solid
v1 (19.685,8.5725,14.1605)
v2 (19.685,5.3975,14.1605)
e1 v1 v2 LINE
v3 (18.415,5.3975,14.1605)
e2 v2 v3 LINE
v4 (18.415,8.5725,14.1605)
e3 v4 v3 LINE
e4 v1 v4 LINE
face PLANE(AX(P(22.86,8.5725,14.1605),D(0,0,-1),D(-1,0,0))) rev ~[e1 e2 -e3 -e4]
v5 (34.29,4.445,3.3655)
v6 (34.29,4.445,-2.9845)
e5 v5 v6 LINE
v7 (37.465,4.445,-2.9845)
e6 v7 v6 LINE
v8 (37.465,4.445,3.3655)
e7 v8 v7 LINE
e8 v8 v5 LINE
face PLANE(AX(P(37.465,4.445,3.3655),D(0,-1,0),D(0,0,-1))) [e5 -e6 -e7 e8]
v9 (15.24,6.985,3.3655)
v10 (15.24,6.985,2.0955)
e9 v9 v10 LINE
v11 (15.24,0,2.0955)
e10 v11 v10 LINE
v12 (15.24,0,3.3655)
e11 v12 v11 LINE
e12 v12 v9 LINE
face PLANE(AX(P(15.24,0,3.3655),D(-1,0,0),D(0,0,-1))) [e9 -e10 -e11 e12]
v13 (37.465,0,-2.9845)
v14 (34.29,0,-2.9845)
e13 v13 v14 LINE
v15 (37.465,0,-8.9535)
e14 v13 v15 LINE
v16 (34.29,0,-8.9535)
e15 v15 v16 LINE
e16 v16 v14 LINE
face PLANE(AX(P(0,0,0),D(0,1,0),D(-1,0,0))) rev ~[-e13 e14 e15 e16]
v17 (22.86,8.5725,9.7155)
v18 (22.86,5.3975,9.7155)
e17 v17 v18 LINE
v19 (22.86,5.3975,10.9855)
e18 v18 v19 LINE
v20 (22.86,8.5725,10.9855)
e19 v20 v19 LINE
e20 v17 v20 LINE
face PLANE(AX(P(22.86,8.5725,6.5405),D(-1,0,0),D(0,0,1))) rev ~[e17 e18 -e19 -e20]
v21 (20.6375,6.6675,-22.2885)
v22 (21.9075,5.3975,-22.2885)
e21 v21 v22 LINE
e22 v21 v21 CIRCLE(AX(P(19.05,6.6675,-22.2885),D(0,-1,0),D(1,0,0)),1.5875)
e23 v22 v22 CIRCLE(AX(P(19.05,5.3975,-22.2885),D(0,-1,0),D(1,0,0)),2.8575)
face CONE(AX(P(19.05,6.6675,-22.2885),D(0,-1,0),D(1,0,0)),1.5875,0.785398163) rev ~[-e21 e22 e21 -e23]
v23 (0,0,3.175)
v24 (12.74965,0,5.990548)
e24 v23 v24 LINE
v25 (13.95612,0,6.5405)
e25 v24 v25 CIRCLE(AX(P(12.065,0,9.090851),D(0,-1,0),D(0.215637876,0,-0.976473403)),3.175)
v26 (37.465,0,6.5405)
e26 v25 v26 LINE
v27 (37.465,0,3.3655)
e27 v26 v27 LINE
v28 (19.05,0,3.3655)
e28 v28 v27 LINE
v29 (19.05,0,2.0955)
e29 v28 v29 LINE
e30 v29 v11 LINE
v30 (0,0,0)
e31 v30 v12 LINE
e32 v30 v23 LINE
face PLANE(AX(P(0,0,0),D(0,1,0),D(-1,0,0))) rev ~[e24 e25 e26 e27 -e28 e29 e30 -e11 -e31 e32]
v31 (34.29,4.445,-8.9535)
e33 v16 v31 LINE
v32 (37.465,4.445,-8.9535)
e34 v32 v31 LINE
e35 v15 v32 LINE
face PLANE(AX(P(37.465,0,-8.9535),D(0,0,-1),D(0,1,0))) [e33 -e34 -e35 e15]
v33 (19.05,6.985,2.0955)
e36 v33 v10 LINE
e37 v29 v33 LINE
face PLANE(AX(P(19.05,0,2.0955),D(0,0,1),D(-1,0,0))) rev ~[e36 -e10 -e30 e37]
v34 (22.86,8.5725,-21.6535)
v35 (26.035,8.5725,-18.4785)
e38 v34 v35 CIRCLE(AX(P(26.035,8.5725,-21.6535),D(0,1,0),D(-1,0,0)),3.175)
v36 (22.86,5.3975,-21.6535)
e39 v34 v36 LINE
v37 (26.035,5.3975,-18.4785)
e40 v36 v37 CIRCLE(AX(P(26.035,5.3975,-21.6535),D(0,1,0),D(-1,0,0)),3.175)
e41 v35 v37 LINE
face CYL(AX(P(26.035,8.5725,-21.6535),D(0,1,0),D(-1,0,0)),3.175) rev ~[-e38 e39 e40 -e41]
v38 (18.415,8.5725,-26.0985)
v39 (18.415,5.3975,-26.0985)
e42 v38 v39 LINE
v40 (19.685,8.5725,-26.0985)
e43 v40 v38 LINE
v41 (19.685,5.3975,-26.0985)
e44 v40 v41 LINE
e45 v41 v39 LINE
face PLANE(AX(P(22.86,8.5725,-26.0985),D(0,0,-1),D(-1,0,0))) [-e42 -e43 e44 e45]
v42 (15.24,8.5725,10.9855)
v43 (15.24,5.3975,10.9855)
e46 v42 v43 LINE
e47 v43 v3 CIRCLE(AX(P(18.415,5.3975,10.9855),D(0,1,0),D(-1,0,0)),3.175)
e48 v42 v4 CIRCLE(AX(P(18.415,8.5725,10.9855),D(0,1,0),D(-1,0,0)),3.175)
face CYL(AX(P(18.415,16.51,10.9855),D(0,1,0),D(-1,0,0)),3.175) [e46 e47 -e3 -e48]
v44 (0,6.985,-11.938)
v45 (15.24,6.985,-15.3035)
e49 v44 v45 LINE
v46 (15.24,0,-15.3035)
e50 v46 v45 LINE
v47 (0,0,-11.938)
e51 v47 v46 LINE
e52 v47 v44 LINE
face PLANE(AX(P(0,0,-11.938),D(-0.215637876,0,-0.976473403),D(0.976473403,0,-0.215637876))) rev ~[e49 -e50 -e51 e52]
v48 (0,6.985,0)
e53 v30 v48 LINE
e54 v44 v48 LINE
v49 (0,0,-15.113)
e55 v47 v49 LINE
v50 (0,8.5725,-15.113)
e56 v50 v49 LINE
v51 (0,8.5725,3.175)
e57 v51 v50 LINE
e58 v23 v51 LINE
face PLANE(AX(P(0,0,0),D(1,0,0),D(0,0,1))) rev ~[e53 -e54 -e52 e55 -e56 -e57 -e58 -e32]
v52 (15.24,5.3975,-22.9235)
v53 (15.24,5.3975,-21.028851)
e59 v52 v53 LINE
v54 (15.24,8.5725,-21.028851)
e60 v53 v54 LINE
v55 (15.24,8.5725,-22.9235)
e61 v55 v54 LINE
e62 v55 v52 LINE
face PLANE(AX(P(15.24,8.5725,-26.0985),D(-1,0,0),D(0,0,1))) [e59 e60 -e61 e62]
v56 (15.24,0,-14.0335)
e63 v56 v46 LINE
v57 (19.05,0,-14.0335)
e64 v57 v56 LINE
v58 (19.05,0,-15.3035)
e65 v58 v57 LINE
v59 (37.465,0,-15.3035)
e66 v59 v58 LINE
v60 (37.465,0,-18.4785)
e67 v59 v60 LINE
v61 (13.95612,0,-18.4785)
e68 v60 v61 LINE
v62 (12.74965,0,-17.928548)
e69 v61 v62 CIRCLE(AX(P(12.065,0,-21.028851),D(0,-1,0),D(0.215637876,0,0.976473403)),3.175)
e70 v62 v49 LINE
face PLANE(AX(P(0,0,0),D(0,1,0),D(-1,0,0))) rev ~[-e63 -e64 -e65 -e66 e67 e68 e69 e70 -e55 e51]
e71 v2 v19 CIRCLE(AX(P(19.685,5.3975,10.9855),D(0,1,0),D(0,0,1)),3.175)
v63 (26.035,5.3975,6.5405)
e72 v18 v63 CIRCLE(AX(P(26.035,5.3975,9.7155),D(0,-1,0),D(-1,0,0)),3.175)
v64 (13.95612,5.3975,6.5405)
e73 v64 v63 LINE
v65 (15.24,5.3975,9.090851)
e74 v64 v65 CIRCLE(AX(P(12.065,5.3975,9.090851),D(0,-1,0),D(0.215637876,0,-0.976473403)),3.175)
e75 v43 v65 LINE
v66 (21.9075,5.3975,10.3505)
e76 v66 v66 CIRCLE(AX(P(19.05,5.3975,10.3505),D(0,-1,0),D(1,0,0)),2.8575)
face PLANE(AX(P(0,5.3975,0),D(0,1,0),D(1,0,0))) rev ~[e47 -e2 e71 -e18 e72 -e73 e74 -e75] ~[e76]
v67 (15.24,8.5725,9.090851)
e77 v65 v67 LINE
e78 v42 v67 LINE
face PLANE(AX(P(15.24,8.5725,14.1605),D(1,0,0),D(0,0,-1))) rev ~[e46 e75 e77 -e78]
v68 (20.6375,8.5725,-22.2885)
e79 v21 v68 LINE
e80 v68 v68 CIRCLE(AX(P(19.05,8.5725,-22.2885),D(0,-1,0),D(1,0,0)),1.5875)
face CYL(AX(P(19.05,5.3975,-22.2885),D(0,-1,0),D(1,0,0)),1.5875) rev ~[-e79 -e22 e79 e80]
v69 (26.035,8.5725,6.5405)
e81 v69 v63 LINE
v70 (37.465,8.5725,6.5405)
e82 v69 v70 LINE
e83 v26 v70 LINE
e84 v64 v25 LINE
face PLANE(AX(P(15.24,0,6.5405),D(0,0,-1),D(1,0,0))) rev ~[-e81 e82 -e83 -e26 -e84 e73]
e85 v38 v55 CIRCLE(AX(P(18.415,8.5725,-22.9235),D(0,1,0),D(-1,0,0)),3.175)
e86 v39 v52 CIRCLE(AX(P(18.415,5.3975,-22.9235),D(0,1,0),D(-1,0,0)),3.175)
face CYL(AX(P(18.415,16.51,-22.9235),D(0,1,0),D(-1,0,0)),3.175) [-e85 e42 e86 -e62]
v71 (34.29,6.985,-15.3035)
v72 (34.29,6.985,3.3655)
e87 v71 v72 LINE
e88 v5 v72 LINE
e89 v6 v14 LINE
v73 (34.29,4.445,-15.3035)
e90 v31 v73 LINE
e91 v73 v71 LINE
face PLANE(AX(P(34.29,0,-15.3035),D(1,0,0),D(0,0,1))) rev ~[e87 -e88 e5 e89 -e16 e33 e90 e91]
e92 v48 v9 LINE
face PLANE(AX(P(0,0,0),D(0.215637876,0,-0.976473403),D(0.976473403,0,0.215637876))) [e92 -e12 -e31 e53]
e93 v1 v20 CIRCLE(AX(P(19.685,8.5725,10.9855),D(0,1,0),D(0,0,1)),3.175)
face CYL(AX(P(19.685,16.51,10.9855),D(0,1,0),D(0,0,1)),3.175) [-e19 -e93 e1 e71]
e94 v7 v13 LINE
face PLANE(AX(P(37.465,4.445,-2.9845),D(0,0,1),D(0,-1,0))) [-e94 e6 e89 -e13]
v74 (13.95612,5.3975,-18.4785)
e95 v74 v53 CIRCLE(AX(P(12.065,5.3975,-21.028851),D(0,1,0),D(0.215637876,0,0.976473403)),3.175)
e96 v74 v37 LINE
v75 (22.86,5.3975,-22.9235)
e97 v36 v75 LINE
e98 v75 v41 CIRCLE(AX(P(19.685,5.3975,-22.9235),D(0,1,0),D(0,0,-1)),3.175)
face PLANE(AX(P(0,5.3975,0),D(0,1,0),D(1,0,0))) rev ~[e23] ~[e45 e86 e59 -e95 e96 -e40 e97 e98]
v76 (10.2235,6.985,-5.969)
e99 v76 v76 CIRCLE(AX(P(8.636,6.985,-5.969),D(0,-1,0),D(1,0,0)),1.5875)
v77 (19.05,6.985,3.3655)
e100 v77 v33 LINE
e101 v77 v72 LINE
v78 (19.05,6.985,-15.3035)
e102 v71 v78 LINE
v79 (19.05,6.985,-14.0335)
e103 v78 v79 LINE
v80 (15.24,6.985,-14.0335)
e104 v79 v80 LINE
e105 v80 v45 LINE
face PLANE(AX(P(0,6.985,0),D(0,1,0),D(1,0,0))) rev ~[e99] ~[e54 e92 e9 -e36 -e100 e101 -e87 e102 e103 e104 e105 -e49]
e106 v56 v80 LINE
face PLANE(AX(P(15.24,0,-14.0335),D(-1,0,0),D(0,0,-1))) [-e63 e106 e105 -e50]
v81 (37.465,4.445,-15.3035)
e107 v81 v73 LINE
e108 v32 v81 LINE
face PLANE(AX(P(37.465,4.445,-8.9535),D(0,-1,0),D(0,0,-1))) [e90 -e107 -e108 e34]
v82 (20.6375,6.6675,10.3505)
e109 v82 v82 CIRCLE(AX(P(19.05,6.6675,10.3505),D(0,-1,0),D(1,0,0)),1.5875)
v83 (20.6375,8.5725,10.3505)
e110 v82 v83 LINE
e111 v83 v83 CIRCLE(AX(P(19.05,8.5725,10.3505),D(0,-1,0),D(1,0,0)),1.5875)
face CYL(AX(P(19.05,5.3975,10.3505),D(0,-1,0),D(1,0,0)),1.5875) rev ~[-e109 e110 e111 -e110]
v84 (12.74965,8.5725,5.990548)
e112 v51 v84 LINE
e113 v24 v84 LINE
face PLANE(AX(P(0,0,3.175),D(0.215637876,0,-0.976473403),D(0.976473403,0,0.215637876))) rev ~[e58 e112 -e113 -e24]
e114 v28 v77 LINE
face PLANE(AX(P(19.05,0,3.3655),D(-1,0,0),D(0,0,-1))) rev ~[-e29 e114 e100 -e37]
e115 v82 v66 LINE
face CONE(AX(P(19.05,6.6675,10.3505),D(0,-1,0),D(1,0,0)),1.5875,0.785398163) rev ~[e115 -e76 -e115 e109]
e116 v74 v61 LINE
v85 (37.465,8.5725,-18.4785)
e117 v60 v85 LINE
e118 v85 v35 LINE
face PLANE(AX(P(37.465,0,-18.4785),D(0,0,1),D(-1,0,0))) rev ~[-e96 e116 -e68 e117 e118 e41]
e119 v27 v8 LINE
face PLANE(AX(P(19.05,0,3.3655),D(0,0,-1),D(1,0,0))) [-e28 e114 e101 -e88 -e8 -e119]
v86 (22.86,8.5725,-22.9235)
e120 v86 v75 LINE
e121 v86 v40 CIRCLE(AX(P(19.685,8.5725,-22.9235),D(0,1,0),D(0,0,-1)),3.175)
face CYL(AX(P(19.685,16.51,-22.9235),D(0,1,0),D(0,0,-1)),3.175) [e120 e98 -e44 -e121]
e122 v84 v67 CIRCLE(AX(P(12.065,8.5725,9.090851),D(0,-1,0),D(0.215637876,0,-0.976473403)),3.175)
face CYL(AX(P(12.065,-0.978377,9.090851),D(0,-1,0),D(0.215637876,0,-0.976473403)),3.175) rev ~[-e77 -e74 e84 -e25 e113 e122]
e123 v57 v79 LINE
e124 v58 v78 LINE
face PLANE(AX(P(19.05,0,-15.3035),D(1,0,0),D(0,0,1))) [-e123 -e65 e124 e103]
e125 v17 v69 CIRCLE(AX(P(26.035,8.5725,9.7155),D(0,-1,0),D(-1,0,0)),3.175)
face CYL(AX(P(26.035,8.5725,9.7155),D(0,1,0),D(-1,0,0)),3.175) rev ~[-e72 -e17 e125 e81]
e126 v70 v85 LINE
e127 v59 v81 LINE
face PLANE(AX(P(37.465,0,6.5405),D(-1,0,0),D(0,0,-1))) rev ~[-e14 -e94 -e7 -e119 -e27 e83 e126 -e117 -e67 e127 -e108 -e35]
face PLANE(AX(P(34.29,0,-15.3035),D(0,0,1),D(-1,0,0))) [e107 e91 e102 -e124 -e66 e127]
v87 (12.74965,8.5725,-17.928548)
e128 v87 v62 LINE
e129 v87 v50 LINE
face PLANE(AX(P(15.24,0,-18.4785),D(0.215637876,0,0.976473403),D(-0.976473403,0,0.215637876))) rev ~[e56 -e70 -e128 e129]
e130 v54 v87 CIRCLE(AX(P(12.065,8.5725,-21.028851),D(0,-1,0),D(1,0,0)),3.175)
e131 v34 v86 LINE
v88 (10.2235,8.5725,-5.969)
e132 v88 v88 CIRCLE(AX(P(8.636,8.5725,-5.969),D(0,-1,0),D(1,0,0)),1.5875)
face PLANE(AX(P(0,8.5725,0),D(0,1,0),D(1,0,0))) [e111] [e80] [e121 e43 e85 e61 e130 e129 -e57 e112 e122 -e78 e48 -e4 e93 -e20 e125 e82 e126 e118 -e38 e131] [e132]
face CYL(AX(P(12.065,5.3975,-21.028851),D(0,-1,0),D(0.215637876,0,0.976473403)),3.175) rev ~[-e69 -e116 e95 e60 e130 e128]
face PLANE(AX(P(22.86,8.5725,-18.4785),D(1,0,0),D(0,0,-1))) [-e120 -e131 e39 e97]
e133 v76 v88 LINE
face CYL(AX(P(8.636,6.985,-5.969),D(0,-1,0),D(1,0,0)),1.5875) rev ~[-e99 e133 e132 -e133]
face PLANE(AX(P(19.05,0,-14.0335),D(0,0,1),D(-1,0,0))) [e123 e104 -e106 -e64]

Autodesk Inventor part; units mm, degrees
ref_plane "YZ Plane" through (0, 0, 0) normal (1, 0, 0) x (0, 1, 0)
ref_plane "XZ Plane" through (0, 0, 0) normal (0, 1, 0) x (-1, 0, 0)
ref_plane "XY Plane" through (0, 0, 0) normal (0, 0, 1) x (1, 0, 0)
sketch "Sketch1" plane through (0, 0, 0) normal (0, 1, 0) x (-1, 0, 0)
  line L0 (0, 0) -> (0, -11.938)
  line L1 (-15.24, 3.3655) -> (-15.24, -15.3035)
  line L2 (0, 0) -> (-15.24, 3.3655)
  line L3 (0, -11.938) -> (-15.24, -15.3035)
  line L4 (-15.24, 3.3655) -> (-19.05, 3.3655)
  line L5 (-19.05, 3.3655) -> (-19.05, 2.0955)
  line L6 (-19.05, 2.0955) -> (-15.24, 2.0955)
  line L7 (-15.24, 2.0955) -> (-15.24, 3.3655)
  line L8 (-15.24, -15.3035) -> (-19.05, -15.3035)
  line L9 (-19.05, -15.3035) -> (-19.05, -14.0335)
  line L10 (-19.05, -14.0335) -> (-15.24, -14.0335)
  line L11 (-15.24, -14.0335) -> (-15.24, -15.3035)
  line L12 (0, 0) -> (0, 3.175)
  line L13 (-15.24, 3.3655) -> (-15.24, 6.5405)
  line L14 (0, -11.938) -> (0, -15.113)
  line L15 (-15.24, -15.3035) -> (-15.24, -18.4785)
  line L16 (-15.24, -18.4785) -> (0, -15.113)
  line L17 (0, 3.175) -> (-15.24, 6.5405)
  line L18 (-15.24, 6.5405) -> (-34.29, 6.5405)
  line L19 (-19.05, 3.3655) -> (-34.29, 3.3655)
  line L20 (-34.29, 3.3655) -> (-34.29, 6.5405)
  line L21 (-15.24, -18.4785) -> (-34.29, -18.4785)
  line L22 (-34.29, -18.4785) -> (-34.29, -15.3035)
  line L23 (-34.29, -15.3035) -> (-19.05, -15.3035)
  line L24 (-34.29, 6.5405) -> (-37.465, 6.5405)
  line L25 (-37.465, 6.5405) -> (-37.465, -18.4785)
  line L26 (-37.465, -18.4785) -> (-34.29, -18.4785)
  line L27 (-34.29, -18.4785) -> (-34.29, 6.5405)
  dimension "d0" = 11.938
  dimension "d1" = 15.24
  dimension "d2" = 18.669
  dimension "d3" = 3.3655
  dimension "d4" = 3.81
  dimension "d5" = 1.27
  dimension "d6" = 3.81
  dimension "d7" = 1.27
  dimension "d8" = 3.175
  dimension "d9" = 3.175
  dimension "d10" = 3.175
  dimension "d11" = 3.175
  dimension "d12" = 19.05
  dimension "d13" = 3.175
extrude "Extrusion1" add sketch "Sketch1" along normal blind 6.985 contours L2 L13 L17 L12 | L14 L16 L15 L3 | L1 L6 L5 L4 | L4 L19 L20 L18 L13 | L8 L9 L10 L1 | L15 L21 L22 L23 L8 | L27 L22 L26 L25 L24 L20
sketch "Sketch2" plane through (0, 6.985, 0) normal (0, 1, 0) x (1, 0, 0)
  line L0 (0, 11.938) -> (15.24, 15.3035) projected
  line L1 (15.24, 15.3035) -> (15.24, 14.0335) projected
  line L2 (15.24, 14.0335) -> (19.05, 14.0335) projected
  line L3 (19.05, 14.0335) -> (19.05, 15.3035) projected
  line L4 (19.05, 15.3035) -> (34.29, 15.3035) projected
  line L5 (34.29, 15.3035) -> (34.29, -3.3655) projected
  line L6 (34.29, -3.3655) -> (19.05, -3.3655) projected
  line L7 (19.05, -3.3655) -> (19.05, -2.0955) projected
  line L8 (19.05, -2.0955) -> (15.24, -2.0955) projected
  line L9 (15.24, -2.0955) -> (15.24, -3.3655) projected
  line L10 (15.24, -3.3655) -> (0, 0) projected
  line L11 (0, 0) -> (0, -3.175) projected
  line L12 (0, -3.175) -> (15.24, -6.5405) projected
  line L13 (15.24, -6.5405) -> (37.465, -6.5405) projected
  line L14 (37.465, -6.5405) -> (37.465, 18.4785) projected
  line L15 (37.465, 18.4785) -> (15.24, 18.4785) projected
  line L16 (15.24, 18.4785) -> (0, 15.113) projected
  line L17 (0, 15.113) -> (0, 11.938) projected
  line L18 (0, 0) -> (0, -3.175) projected
  line L19 (15.24, 18.4785) -> (0, 15.113) projected
  line L20 (0, -3.175) -> (0, 15.113)
extrude "Extrusion2" add sketch "Sketch2" along normal blind 1.5875
sketch "Sketch3" plane through (37.465, 0, 6.5405) normal (1, 0, 0) x (0, 0, -1)
  line L0 (21.844, 0) -> (21.844, 6.985) projected
  line L1 (21.844, 0) -> (3.175, 0) projected
  line L2 (3.175, 0) -> (3.175, 6.985) projected
  line L3 (21.844, 6.985) -> (3.175, 6.985) projected
  line L4 (3.175, 0) -> (3.175, 6.985) projected
  line L5 (3.175, 4.445) -> (9.525, 4.445)
  line L6 (9.525, 4.445) -> (9.525, 0)
  line L7 (9.525, 0) -> (3.175, 0)
  line L8 (3.175, 0) -> (3.175, 4.445)
  line L9 (21.844, 0) -> (21.844, 6.985) projected
  line L10 (21.844, 0) -> (15.494, 0)
  line L11 (15.494, 0) -> (15.494, 4.445)
  line L12 (15.494, 4.445) -> (21.844, 4.445)
  line L13 (21.844, 4.445) -> (21.844, 0)
  line L14 (0, 0) -> (25.019, 0) projected
  point P0 (6.5405, 0)
  dimension "d18" = 6.35
  dimension "d19" = 6.35
  dimension "d20" = 4.445
  dimension "d21" = 4.445
extrude "Extrusion3" cut sketch "Sketch3" against normal blind 3.175 contours L1 L11 L12 L0 | L1 L2 L5 L6
sketch "Sketch5" plane through (0, 6.985, 0) normal (0, -1, 0) x (1, 0, 0)
  circle A0 centre (8.636, -5.969) radius 1.5875
  line L0 (0, 0) -> (0, 3.175) projected
  line L1 (0, -11.938) -> (0, 0) projected
  dimension "d24" = 3.175
  dimension "d25" = 8.636
extrude "Extrusion4" cut sketch "Sketch5" against normal blind 25.4
sketch "Sketch6" plane through (0, 8.5725, 0) normal (0, 1, 0) x (1, 0, 0)
  line L0 (37.465, 18.4785) -> (15.24, 18.4785) projected
  line L1 (15.24, -6.5405) -> (37.465, -6.5405) projected
  line L2 (15.24, 18.4785) -> (0, 15.113) projected
  line L3 (15.24, 18.4785) -> (22.86, 18.4785)
  line L4 (22.86, 18.4785) -> (22.86, 26.0985)
  line L5 (22.86, 26.0985) -> (15.24, 26.0985)
  line L6 (15.24, 26.0985) -> (15.24, 18.4785)
  line L7 (15.24, -6.5405) -> (22.86, -6.5405)
  line L8 (22.86, -6.5405) -> (22.86, -14.1605)
  line L9 (22.86, -14.1605) -> (15.24, -14.1605)
  line L10 (15.24, -14.1605) -> (15.24, -6.5405)
  point P0 (0, 0)
  dimension "d28" = 7.62
  dimension "d29" = 7.62
  dimension "d30" = 7.62
  dimension "d31" = 7.62
extrude "Extrusion5" add sketch "Sketch6" against normal blind 3.175
sketch "Sketch7" plane through (0, 5.3975, 0) normal (0, -1, 0) x (1, 0, 0)
  line L0 (22.86, 6.5405) -> (15.24, 6.5405) projected
  line L1 (22.86, 6.5405) -> (22.86, 14.1605) projected
  line L2 (22.86, 14.1605) -> (15.24, 14.1605) projected
  line L3 (15.24, 14.1605) -> (15.24, 6.5405) projected
  line L4 (15.24, -18.4785) -> (22.86, -18.4785) projected
  line L5 (15.24, -18.4785) -> (15.24, -26.0985) projected
  line L6 (15.24, -26.0985) -> (22.86, -26.0985) projected
  line L7 (22.86, -26.0985) -> (22.86, -18.4785) projected
  circle A0 centre (19.05, 10.3505) radius 1.5875
  circle A1 centre (19.05, -22.2885) radius 1.5875
  point P0 (0, 0)
  dimension "d34" = 3.175
  dimension "d35" = 3.175
extrude "Extrusion6" cut sketch "Sketch7" against normal through all contours A0 | A1
chamfer "Chamfer1" distance 1.27 angle 45 2 edges at (17.4625, 5.3975, 10.3505) (17.4625, 5.3975, -22.2885)
fillet "Fillet1" radius 3.175 8 edges at (15.24, 6.985, -26.0985) (22.86, 6.985, -26.0985) (15.24, 6.985, -18.4785) (22.86, 6.985, -18.4785) (15.24, 6.985, 6.5405) (15.24, 6.985, 14.1605) (22.86, 6.985, 14.1605) (22.86, 6.985, 6.5405)
equation "\"d3\" = -0.5 * d0 + 0.5 * d2"
properties part number "phototransistorMount1" material "ABS Plastic"
